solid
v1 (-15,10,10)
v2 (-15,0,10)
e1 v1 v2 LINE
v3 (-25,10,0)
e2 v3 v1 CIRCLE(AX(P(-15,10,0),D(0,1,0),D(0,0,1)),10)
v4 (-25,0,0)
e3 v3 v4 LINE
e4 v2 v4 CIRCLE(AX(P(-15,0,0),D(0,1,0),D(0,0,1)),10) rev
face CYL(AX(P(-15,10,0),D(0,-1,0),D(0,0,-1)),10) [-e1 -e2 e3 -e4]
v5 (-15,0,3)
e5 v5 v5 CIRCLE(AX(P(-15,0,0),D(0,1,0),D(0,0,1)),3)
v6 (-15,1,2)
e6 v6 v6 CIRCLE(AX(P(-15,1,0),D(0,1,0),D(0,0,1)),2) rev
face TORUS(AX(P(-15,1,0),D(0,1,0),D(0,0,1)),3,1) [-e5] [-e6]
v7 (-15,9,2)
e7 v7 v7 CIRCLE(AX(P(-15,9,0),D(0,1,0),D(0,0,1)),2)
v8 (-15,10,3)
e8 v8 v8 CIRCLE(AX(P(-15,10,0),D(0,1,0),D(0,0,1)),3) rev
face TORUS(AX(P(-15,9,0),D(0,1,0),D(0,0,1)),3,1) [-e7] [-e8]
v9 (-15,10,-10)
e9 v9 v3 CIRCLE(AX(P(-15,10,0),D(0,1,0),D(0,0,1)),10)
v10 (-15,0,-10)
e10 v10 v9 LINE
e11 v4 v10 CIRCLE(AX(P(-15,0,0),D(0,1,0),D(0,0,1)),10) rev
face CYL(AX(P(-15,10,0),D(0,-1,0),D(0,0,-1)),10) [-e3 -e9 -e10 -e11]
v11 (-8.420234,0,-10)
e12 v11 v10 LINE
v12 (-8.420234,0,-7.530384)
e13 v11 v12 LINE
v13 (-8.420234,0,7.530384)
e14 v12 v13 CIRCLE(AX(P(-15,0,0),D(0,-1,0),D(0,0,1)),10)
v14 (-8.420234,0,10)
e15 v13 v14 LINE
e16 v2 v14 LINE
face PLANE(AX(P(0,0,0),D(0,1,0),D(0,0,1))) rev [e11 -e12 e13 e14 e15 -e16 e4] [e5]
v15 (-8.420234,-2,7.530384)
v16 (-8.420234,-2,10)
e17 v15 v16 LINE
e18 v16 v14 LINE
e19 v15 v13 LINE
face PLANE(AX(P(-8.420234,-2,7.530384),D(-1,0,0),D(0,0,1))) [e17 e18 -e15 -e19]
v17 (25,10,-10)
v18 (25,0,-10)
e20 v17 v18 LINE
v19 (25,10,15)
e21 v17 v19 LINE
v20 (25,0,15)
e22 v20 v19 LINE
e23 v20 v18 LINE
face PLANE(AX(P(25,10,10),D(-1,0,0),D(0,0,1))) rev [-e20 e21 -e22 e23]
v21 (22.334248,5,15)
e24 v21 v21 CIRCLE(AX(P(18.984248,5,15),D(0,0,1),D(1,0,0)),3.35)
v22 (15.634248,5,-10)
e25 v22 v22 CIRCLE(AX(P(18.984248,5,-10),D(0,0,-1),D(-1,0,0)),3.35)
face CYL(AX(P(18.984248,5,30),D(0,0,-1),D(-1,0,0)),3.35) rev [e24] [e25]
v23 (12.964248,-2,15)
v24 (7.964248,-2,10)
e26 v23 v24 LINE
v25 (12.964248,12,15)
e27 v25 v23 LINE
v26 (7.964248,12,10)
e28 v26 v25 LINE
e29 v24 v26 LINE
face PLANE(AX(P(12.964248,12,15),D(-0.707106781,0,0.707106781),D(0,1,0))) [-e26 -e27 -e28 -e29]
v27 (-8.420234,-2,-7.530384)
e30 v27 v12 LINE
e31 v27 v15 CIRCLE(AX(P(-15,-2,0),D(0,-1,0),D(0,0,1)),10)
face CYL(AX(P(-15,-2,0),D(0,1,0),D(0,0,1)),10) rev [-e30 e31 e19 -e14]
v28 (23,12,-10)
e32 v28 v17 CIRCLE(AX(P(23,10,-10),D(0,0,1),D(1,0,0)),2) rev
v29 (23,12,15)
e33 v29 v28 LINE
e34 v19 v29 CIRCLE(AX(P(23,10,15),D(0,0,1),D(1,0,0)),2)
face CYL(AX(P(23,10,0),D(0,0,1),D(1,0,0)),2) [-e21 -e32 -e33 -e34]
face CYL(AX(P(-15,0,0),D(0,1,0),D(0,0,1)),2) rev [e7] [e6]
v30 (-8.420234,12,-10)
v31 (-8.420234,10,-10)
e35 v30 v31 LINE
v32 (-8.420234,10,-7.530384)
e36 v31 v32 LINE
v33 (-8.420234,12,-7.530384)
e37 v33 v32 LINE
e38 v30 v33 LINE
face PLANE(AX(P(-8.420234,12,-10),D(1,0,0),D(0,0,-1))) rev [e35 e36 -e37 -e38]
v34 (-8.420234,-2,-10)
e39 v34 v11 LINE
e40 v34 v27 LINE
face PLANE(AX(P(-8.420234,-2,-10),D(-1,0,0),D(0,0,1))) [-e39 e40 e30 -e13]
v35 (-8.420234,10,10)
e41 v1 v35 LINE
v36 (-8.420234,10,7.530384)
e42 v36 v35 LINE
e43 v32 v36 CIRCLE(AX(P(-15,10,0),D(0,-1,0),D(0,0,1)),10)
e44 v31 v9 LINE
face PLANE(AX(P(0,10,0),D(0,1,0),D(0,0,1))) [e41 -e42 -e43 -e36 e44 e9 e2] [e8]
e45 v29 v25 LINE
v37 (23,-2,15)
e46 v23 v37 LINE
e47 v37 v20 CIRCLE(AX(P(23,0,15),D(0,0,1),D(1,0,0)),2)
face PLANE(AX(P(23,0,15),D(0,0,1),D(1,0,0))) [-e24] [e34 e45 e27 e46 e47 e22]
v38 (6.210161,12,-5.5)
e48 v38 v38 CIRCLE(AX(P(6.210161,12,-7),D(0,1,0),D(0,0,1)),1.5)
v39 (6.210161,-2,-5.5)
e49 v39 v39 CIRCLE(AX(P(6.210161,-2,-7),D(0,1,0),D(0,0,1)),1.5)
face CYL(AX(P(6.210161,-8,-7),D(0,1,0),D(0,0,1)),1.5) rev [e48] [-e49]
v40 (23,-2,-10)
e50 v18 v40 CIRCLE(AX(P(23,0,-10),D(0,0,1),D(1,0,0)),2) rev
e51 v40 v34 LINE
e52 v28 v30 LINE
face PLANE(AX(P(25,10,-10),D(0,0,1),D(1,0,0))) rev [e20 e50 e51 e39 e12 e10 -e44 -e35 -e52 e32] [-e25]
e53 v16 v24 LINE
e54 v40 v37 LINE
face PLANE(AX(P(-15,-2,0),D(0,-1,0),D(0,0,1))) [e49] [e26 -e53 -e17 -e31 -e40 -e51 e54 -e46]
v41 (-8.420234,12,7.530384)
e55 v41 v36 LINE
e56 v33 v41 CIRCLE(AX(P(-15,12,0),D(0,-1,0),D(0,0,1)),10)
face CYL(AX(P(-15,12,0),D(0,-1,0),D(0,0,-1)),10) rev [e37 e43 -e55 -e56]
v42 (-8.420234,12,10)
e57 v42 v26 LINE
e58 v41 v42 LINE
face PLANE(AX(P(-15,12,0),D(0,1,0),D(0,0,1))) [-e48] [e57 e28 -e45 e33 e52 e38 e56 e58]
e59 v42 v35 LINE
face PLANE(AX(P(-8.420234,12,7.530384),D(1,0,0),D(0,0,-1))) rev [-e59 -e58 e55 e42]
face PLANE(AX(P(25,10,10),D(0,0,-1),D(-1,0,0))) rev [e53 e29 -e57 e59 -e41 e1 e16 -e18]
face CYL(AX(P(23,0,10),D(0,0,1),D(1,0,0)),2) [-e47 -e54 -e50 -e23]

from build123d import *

# Parameters (mm, degrees)
SKETCH1_W           = 50
SKETCH1_H           = 20
BOSS_EXTRUDE1_DEPTH = 10
FILLET1_R           = 10
SKETCH2_R           = 2
CUT_EXTRUDE1_DEPTH  = 10
SKETCH4_R           = 3.35
CUT_EXTRUDE2_DEPTH  = 40
BOSS_EXTRUDE3_DEPTH = 2
SKETCH7_R           = 1.5
CUT_EXTRUDE3_DEPTH  = 20
FILLET3_R           = 2
FILLET4_R           = 1
SKETCH8_R           = 3.35
BOSS_EXTRUDE4_DEPTH = 5
CHAMFER1_SIZE       = 5


with BuildPart() as part:
    # Sketch1 → Boss-Extrude1 (new body)
    with BuildSketch(Plane(origin=(0, 0, 0), x_dir=(1, 0, 0), z_dir=(0, 1, 0))):
        Rectangle(SKETCH1_W, SKETCH1_H)
    extrude(amount=BOSS_EXTRUDE1_DEPTH)

    # Fillet1
    fillet1_edges = [part.edges().sort_by_distance(p)[0] for p in [
        (-25, 5, 10),
        (-25, 5, -10),
    ]]
    fillet(fillet1_edges, radius=FILLET1_R - 0.0001)  # a hair under: the kernel refuses the full size

    # Sketch2 → Cut-Extrude1 (cut)
    with BuildSketch(Plane(origin=(0, 10, 0), x_dir=(1, 0, 0), z_dir=(0, 1, 0))):
        with Locations(Location((-15, 0, 0), (0, 0, 270))):
            Circle(SKETCH2_R)
    extrude(amount=-CUT_EXTRUDE1_DEPTH, mode=Mode.SUBTRACT)

    # Sketch4 → Cut-Extrude2 (cut)
    with BuildSketch(Plane(origin=(0, 0, -10), x_dir=(-1, 0, 0), z_dir=(0, 0, -1))):
        with Locations((-18.984247751, 5)):
            Circle(SKETCH4_R)
    extrude(amount=-CUT_EXTRUDE2_DEPTH, mode=Mode.SUBTRACT)

    # Sketch6 → Boss-Extrude3 (add)
    with BuildSketch(Plane(origin=(0, 10, 0), x_dir=(1, 0, 0), z_dir=(0, 1, 0))):
        with BuildLine():
            Line((-8.420233762, 10), (-8.420233762, 7.53038354))
            ThreePointArc((-8.420233762, 7.53038354), (-5, 0), (-8.420233762, -7.53038354))
            Line((-8.420233762, -7.53038354), (-8.420233762, -10))
            Line((-8.420233762, -10), (25, -10))
            Line((25, -10), (25, 10))
            Line((25, 10), (-8.420233762, 10))
        make_face()
    boss_extrude3 = extrude(amount=BOSS_EXTRUDE3_DEPTH)

    # Sketch7 → Cut-Extrude3 (cut)
    with BuildSketch(Plane(origin=(0, 12, 0), x_dir=(1, 0, 0), z_dir=(0, 1, 0))):
        with Locations(Location((6.210160934, 7, 0), (0, 0, 270))):
            Circle(SKETCH7_R)
    cut_extrude3 = extrude(amount=-CUT_EXTRUDE3_DEPTH, mode=Mode.SUBTRACT)

    # Mirror3: Boss-Extrude3, Cut-Extrude3 across plane
    add(boss_extrude3.mirror(Plane(origin=(0, 5, 0), x_dir=(0, 0, 1), z_dir=(0, -1, 0))))
    add(cut_extrude3.mirror(Plane(origin=(0, 5, 0), x_dir=(0, 0, 1), z_dir=(0, -1, 0))), mode=Mode.SUBTRACT)

    # Fillet3
    fillet3_edges = [part.edges().sort_by_distance(p)[0] for p in [
        (25, 12, 0),
        (25, -2, 0),
    ]]
    fillet(fillet3_edges, radius=FILLET3_R)

    # Fillet4
    fillet4_edges = [part.edges().sort_by_distance(p)[0] for p in [
        (-15, 0, -2),
        (-15, 10, -2),
    ]]
    fillet(fillet4_edges, radius=FILLET4_R)

    # Sketch8 → Boss-Extrude4 (add)
    with BuildSketch(Plane.XY.offset(10)):
        with BuildLine():
            Line((12.964247751, 12), (12.964247751, -2))
            Line((12.964247751, -2), (23, -2))
            ThreePointArc((23, -2), (24.414213562, -1.414213562), (25, 0))
            Line((25, 0), (25, 10))
            ThreePointArc((25, 10), (24.414213562, 11.414213562), (23, 12))
            Line((23, 12), (12.964247751, 12))
        make_face()
        with Locations(Location((18.984247751, 5, 0), (0, 0, 180))):
            Circle(SKETCH8_R, mode=Mode.SUBTRACT)
    extrude(amount=BOSS_EXTRUDE4_DEPTH)

    # Chamfer1
    chamfer1_edges = [part.edges().sort_by_distance(p)[0] for p in [
        (12.964247751, 5, 10),
    ]]
    chamfer(chamfer1_edges, length=CHAMFER1_SIZE - 0.0001)  # a hair under: the kernel refuses the full size


solid = part.part
